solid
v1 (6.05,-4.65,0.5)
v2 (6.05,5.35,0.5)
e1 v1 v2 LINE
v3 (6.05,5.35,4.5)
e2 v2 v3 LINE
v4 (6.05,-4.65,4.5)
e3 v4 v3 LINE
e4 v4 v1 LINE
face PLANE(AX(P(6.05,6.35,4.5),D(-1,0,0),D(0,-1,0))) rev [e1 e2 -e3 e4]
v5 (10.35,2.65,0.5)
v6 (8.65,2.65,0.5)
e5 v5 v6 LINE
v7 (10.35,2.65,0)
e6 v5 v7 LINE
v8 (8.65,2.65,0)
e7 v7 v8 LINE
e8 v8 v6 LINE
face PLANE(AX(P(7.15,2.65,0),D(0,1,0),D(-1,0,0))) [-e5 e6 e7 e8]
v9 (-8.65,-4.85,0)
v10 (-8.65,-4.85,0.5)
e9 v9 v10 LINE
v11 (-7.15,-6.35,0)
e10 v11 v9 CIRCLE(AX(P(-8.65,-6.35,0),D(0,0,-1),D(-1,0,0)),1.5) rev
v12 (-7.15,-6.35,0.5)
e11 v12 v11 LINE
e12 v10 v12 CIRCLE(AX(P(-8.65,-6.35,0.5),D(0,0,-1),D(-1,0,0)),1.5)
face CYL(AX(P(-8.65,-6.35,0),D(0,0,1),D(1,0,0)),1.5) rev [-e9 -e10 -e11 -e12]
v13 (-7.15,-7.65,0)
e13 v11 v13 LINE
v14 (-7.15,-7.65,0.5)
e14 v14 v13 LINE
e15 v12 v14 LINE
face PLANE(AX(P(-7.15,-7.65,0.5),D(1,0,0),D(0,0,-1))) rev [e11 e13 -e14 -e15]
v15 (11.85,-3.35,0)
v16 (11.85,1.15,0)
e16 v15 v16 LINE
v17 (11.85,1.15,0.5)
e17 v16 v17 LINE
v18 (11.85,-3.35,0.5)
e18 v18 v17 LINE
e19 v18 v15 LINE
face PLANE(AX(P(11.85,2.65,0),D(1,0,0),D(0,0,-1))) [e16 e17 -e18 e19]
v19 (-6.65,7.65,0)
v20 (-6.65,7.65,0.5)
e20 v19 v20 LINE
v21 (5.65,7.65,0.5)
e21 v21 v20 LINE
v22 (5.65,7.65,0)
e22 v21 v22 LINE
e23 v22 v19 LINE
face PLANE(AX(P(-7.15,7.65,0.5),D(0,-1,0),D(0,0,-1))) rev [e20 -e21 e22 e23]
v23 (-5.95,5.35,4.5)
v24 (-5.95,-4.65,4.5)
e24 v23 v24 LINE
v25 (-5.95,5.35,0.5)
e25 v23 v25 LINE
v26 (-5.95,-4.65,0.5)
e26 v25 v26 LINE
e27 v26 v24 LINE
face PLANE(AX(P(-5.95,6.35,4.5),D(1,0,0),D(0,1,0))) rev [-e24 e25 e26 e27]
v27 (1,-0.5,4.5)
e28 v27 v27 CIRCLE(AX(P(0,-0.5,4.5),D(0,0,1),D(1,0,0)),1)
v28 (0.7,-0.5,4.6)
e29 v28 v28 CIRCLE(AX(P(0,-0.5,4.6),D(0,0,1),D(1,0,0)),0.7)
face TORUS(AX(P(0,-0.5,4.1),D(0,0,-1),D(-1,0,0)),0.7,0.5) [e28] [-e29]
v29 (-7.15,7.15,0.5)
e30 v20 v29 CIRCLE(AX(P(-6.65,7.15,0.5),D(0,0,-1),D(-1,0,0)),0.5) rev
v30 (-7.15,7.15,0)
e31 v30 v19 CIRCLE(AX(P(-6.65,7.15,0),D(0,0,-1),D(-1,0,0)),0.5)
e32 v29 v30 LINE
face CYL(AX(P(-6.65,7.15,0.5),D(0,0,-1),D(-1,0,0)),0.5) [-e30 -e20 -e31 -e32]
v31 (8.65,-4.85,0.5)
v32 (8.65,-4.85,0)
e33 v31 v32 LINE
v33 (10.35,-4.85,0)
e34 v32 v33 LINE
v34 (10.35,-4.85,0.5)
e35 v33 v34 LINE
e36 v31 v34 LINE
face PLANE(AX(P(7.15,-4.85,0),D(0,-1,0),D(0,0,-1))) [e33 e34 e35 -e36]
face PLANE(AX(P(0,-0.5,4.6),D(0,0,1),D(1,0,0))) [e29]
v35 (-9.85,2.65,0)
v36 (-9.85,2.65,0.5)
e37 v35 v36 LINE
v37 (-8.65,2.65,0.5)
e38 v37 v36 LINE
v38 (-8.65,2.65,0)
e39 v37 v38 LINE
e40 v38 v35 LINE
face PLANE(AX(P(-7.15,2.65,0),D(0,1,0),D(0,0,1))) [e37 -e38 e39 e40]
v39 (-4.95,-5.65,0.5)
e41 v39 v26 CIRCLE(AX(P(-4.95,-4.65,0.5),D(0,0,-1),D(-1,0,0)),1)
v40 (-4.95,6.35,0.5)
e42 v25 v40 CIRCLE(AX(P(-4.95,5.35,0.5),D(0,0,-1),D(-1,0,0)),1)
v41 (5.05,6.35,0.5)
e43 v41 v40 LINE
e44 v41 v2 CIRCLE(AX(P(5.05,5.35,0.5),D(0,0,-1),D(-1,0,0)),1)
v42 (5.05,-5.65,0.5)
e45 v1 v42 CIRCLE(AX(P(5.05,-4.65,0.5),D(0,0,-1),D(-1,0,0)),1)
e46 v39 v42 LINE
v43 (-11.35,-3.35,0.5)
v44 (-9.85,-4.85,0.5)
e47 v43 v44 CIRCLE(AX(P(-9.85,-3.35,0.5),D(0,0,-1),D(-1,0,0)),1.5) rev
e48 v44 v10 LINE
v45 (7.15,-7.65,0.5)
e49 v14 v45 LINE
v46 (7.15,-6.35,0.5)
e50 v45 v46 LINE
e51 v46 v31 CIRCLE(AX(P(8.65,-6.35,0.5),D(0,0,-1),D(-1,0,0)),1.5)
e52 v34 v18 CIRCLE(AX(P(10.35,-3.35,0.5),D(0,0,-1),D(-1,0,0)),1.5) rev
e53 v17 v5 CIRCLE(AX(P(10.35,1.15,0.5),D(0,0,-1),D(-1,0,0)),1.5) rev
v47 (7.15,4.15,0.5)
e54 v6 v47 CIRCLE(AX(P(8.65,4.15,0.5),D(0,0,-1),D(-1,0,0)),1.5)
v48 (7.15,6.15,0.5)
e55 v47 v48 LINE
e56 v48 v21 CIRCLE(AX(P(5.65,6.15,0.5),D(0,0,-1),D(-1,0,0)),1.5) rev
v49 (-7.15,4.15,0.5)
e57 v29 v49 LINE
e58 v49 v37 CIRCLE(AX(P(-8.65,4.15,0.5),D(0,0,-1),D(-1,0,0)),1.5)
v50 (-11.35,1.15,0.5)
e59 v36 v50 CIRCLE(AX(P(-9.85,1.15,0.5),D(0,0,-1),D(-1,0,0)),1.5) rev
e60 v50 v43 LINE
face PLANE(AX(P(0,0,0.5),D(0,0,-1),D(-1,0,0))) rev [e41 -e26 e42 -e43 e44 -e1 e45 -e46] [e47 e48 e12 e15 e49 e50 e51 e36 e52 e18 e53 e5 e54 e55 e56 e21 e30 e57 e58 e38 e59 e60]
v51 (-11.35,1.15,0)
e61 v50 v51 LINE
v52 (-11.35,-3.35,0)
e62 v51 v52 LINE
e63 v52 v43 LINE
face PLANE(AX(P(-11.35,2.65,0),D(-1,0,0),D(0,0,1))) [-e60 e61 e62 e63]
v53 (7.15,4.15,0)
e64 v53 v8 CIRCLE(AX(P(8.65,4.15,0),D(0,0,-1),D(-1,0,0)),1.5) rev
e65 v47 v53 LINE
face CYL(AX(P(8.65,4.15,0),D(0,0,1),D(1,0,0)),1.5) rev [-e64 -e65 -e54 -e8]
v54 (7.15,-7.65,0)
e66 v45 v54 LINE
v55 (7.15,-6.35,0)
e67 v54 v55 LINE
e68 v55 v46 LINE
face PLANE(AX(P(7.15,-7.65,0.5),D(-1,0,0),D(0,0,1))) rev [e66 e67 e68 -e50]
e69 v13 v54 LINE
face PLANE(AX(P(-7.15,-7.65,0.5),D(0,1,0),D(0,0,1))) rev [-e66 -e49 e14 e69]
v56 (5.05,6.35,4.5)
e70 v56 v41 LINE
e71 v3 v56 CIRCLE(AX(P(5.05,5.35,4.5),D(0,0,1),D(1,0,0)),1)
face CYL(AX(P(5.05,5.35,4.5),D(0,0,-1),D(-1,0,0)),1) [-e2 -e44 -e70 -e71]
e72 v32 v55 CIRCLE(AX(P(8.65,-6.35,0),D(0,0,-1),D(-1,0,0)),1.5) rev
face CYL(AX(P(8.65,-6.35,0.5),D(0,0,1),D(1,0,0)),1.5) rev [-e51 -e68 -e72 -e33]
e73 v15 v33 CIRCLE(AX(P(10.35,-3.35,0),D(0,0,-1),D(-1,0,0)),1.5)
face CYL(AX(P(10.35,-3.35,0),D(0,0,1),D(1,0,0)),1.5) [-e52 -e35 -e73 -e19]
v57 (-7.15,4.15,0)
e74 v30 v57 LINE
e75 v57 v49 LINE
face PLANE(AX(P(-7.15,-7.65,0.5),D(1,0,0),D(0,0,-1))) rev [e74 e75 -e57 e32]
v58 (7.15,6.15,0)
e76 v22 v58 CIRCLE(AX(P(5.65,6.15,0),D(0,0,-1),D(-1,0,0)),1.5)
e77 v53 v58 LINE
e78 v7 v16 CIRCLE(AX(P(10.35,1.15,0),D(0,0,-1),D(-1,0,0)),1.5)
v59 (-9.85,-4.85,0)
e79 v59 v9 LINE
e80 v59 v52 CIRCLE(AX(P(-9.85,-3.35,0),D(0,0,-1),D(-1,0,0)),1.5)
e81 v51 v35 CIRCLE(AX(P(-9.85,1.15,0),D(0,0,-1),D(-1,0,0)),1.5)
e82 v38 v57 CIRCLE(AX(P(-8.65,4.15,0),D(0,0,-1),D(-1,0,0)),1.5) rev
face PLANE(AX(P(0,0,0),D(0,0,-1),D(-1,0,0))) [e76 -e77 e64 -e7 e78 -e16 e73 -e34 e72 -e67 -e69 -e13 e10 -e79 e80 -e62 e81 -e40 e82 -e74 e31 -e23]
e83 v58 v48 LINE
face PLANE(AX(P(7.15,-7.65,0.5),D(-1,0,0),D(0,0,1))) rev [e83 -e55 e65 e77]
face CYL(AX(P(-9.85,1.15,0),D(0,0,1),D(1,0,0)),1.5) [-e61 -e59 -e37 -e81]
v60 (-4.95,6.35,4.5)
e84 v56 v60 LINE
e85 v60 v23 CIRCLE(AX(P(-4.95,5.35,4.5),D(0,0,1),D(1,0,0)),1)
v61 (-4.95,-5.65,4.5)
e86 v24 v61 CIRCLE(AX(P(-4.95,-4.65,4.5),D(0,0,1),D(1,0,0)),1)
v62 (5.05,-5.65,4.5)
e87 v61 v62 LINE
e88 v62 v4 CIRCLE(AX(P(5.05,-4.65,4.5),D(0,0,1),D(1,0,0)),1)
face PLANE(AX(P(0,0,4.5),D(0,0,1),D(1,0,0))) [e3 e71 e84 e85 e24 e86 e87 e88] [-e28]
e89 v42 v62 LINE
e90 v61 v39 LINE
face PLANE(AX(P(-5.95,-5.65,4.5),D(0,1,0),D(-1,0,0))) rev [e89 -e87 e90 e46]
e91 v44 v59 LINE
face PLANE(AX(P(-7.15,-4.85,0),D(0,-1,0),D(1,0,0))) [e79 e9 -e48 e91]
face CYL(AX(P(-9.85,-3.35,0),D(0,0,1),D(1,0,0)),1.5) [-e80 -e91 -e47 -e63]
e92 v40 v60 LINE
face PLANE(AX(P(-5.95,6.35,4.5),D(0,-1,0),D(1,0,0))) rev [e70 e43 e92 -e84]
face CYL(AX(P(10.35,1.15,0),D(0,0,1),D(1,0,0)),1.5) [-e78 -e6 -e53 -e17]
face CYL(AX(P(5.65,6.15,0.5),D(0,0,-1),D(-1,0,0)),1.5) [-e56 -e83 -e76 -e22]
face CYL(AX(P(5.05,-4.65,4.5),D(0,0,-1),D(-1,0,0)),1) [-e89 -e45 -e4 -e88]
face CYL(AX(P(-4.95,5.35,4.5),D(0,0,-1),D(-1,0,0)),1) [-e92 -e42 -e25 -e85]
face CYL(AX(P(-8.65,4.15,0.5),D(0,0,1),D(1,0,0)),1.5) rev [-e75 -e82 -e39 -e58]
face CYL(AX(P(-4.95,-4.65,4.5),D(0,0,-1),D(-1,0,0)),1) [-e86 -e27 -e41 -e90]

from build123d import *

# Parameters (mm, degrees)
SKETCH_1_W      = 14.3
SKETCH_1_H      = 15.3
EXTRUDE_1_DEPTH = 0.5
SKETCH_2_W      = 4.2
SKETCH_2_H      = 7.5
SKETCH_2_W_2    = 4.7
EXTRUDE_2_DEPTH = 0.5
FILLET_1_R      = 1.5
FILLET_2_R      = 0.5
SKETCH_3_W      = 12
SKETCH_3_H      = 12
EXTRUDE_3_DEPTH = 4
FILLET_3_R      = 1
SKETCH_4_R      = 1
EXTRUDE_4_DEPTH = 0.1
FILLET_4_R      = 0.5


with BuildPart() as part:
    # ｽｹｯﾁ1 → ﾎﾞｽ - 押し出し1 (new body)
    with BuildSketch(Plane.XY):
        Rectangle(SKETCH_1_W, SKETCH_1_H)
    extrude(amount=EXTRUDE_1_DEPTH)

    # ｽｹｯﾁ2 → ﾎﾞｽ - 押し出し2 (add)
    with BuildSketch(Plane.XY.offset(0.5)):
        with Locations((-9.25, -1.1)):
            Rectangle(SKETCH_2_W, SKETCH_2_H)
        with Locations((9.5, -1.1)):
            Rectangle(SKETCH_2_W_2, SKETCH_2_H)
    extrude(amount=-EXTRUDE_2_DEPTH)

    # ﾌｨﾚｯﾄ1
    fillet_1_edges = [part.edges().sort_by_distance(p)[0] for p in [
        (-7.15, 2.65, 0.25),
        (-7.15, -4.85, 0.25),
        (-11.35, -4.85, 0.25),
        (-11.35, 2.65, 0.25),
        (7.15, -4.85, 0.25),
        (7.15, 2.65, 0.25),
        (11.85, 2.65, 0.25),
        (11.85, -4.85, 0.25),
        (7.15, 7.65, 0.25),
    ]]
    fillet(fillet_1_edges, radius=FILLET_1_R)

    # ﾌｨﾚｯﾄ2
    fillet_2_edges = [part.edges().sort_by_distance(p)[0] for p in [
        (-7.15, 7.65, 0.25),
    ]]
    fillet(fillet_2_edges, radius=FILLET_2_R)

    # ｽｹｯﾁ3 → ﾎﾞｽ - 押し出し3 (add)
    with BuildSketch(Plane.XY.offset(0.5)):
        with Locations((0.05, 0.35)):
            Rectangle(SKETCH_3_W, SKETCH_3_H)
    extrude(amount=EXTRUDE_3_DEPTH)

    # ﾌｨﾚｯﾄ3
    fillet_3_edges = [part.edges().sort_by_distance(p)[0] for p in [
        (-5.95, 6.35, 2.5),
        (-5.95, -5.65, 2.5),
        (6.05, -5.65, 2.5),
        (6.05, 6.35, 2.5),
    ]]
    fillet(fillet_3_edges, radius=FILLET_3_R)

    # ｽｹｯﾁ4 → ﾎﾞｽ - 押し出し4 (add)
    with BuildSketch(Plane.XY.offset(4.5)):
        with Locations((0, -0.5)):
            Circle(SKETCH_4_R)
    extrude(amount=EXTRUDE_4_DEPTH)

    # ﾌｨﾚｯﾄ4
    # the kernel refuses this fillet: 0.5 mm, written as the material it takes off along each edge
    with BuildSketch(Plane(origin=(0, -0.5, 4.6), x_dir=(1, 0, 0), z_dir=(0, -1, 0))) as fillet_4_piece_1:
        with BuildLine():
            CenterArc((0.7, -0.5), FILLET_4_R, 53.130102354, 36.869897646)
            Line((0.7, 0), (0.7, 0.01))
            Line((0.7, 0.01), (1, 0.01))
            Line((1, 0.01), (1.01, 0))
            ThreePointArc((1.01, 0), (1.01, -0.05), (1.006, -0.092))
            Line((1.006, -0.092), (1, -0.1))
        make_face()
    revolve(axis=Axis((0, -0.5, 4.6), (0, 0, 1)), mode=Mode.SUBTRACT)


solid = part.part
